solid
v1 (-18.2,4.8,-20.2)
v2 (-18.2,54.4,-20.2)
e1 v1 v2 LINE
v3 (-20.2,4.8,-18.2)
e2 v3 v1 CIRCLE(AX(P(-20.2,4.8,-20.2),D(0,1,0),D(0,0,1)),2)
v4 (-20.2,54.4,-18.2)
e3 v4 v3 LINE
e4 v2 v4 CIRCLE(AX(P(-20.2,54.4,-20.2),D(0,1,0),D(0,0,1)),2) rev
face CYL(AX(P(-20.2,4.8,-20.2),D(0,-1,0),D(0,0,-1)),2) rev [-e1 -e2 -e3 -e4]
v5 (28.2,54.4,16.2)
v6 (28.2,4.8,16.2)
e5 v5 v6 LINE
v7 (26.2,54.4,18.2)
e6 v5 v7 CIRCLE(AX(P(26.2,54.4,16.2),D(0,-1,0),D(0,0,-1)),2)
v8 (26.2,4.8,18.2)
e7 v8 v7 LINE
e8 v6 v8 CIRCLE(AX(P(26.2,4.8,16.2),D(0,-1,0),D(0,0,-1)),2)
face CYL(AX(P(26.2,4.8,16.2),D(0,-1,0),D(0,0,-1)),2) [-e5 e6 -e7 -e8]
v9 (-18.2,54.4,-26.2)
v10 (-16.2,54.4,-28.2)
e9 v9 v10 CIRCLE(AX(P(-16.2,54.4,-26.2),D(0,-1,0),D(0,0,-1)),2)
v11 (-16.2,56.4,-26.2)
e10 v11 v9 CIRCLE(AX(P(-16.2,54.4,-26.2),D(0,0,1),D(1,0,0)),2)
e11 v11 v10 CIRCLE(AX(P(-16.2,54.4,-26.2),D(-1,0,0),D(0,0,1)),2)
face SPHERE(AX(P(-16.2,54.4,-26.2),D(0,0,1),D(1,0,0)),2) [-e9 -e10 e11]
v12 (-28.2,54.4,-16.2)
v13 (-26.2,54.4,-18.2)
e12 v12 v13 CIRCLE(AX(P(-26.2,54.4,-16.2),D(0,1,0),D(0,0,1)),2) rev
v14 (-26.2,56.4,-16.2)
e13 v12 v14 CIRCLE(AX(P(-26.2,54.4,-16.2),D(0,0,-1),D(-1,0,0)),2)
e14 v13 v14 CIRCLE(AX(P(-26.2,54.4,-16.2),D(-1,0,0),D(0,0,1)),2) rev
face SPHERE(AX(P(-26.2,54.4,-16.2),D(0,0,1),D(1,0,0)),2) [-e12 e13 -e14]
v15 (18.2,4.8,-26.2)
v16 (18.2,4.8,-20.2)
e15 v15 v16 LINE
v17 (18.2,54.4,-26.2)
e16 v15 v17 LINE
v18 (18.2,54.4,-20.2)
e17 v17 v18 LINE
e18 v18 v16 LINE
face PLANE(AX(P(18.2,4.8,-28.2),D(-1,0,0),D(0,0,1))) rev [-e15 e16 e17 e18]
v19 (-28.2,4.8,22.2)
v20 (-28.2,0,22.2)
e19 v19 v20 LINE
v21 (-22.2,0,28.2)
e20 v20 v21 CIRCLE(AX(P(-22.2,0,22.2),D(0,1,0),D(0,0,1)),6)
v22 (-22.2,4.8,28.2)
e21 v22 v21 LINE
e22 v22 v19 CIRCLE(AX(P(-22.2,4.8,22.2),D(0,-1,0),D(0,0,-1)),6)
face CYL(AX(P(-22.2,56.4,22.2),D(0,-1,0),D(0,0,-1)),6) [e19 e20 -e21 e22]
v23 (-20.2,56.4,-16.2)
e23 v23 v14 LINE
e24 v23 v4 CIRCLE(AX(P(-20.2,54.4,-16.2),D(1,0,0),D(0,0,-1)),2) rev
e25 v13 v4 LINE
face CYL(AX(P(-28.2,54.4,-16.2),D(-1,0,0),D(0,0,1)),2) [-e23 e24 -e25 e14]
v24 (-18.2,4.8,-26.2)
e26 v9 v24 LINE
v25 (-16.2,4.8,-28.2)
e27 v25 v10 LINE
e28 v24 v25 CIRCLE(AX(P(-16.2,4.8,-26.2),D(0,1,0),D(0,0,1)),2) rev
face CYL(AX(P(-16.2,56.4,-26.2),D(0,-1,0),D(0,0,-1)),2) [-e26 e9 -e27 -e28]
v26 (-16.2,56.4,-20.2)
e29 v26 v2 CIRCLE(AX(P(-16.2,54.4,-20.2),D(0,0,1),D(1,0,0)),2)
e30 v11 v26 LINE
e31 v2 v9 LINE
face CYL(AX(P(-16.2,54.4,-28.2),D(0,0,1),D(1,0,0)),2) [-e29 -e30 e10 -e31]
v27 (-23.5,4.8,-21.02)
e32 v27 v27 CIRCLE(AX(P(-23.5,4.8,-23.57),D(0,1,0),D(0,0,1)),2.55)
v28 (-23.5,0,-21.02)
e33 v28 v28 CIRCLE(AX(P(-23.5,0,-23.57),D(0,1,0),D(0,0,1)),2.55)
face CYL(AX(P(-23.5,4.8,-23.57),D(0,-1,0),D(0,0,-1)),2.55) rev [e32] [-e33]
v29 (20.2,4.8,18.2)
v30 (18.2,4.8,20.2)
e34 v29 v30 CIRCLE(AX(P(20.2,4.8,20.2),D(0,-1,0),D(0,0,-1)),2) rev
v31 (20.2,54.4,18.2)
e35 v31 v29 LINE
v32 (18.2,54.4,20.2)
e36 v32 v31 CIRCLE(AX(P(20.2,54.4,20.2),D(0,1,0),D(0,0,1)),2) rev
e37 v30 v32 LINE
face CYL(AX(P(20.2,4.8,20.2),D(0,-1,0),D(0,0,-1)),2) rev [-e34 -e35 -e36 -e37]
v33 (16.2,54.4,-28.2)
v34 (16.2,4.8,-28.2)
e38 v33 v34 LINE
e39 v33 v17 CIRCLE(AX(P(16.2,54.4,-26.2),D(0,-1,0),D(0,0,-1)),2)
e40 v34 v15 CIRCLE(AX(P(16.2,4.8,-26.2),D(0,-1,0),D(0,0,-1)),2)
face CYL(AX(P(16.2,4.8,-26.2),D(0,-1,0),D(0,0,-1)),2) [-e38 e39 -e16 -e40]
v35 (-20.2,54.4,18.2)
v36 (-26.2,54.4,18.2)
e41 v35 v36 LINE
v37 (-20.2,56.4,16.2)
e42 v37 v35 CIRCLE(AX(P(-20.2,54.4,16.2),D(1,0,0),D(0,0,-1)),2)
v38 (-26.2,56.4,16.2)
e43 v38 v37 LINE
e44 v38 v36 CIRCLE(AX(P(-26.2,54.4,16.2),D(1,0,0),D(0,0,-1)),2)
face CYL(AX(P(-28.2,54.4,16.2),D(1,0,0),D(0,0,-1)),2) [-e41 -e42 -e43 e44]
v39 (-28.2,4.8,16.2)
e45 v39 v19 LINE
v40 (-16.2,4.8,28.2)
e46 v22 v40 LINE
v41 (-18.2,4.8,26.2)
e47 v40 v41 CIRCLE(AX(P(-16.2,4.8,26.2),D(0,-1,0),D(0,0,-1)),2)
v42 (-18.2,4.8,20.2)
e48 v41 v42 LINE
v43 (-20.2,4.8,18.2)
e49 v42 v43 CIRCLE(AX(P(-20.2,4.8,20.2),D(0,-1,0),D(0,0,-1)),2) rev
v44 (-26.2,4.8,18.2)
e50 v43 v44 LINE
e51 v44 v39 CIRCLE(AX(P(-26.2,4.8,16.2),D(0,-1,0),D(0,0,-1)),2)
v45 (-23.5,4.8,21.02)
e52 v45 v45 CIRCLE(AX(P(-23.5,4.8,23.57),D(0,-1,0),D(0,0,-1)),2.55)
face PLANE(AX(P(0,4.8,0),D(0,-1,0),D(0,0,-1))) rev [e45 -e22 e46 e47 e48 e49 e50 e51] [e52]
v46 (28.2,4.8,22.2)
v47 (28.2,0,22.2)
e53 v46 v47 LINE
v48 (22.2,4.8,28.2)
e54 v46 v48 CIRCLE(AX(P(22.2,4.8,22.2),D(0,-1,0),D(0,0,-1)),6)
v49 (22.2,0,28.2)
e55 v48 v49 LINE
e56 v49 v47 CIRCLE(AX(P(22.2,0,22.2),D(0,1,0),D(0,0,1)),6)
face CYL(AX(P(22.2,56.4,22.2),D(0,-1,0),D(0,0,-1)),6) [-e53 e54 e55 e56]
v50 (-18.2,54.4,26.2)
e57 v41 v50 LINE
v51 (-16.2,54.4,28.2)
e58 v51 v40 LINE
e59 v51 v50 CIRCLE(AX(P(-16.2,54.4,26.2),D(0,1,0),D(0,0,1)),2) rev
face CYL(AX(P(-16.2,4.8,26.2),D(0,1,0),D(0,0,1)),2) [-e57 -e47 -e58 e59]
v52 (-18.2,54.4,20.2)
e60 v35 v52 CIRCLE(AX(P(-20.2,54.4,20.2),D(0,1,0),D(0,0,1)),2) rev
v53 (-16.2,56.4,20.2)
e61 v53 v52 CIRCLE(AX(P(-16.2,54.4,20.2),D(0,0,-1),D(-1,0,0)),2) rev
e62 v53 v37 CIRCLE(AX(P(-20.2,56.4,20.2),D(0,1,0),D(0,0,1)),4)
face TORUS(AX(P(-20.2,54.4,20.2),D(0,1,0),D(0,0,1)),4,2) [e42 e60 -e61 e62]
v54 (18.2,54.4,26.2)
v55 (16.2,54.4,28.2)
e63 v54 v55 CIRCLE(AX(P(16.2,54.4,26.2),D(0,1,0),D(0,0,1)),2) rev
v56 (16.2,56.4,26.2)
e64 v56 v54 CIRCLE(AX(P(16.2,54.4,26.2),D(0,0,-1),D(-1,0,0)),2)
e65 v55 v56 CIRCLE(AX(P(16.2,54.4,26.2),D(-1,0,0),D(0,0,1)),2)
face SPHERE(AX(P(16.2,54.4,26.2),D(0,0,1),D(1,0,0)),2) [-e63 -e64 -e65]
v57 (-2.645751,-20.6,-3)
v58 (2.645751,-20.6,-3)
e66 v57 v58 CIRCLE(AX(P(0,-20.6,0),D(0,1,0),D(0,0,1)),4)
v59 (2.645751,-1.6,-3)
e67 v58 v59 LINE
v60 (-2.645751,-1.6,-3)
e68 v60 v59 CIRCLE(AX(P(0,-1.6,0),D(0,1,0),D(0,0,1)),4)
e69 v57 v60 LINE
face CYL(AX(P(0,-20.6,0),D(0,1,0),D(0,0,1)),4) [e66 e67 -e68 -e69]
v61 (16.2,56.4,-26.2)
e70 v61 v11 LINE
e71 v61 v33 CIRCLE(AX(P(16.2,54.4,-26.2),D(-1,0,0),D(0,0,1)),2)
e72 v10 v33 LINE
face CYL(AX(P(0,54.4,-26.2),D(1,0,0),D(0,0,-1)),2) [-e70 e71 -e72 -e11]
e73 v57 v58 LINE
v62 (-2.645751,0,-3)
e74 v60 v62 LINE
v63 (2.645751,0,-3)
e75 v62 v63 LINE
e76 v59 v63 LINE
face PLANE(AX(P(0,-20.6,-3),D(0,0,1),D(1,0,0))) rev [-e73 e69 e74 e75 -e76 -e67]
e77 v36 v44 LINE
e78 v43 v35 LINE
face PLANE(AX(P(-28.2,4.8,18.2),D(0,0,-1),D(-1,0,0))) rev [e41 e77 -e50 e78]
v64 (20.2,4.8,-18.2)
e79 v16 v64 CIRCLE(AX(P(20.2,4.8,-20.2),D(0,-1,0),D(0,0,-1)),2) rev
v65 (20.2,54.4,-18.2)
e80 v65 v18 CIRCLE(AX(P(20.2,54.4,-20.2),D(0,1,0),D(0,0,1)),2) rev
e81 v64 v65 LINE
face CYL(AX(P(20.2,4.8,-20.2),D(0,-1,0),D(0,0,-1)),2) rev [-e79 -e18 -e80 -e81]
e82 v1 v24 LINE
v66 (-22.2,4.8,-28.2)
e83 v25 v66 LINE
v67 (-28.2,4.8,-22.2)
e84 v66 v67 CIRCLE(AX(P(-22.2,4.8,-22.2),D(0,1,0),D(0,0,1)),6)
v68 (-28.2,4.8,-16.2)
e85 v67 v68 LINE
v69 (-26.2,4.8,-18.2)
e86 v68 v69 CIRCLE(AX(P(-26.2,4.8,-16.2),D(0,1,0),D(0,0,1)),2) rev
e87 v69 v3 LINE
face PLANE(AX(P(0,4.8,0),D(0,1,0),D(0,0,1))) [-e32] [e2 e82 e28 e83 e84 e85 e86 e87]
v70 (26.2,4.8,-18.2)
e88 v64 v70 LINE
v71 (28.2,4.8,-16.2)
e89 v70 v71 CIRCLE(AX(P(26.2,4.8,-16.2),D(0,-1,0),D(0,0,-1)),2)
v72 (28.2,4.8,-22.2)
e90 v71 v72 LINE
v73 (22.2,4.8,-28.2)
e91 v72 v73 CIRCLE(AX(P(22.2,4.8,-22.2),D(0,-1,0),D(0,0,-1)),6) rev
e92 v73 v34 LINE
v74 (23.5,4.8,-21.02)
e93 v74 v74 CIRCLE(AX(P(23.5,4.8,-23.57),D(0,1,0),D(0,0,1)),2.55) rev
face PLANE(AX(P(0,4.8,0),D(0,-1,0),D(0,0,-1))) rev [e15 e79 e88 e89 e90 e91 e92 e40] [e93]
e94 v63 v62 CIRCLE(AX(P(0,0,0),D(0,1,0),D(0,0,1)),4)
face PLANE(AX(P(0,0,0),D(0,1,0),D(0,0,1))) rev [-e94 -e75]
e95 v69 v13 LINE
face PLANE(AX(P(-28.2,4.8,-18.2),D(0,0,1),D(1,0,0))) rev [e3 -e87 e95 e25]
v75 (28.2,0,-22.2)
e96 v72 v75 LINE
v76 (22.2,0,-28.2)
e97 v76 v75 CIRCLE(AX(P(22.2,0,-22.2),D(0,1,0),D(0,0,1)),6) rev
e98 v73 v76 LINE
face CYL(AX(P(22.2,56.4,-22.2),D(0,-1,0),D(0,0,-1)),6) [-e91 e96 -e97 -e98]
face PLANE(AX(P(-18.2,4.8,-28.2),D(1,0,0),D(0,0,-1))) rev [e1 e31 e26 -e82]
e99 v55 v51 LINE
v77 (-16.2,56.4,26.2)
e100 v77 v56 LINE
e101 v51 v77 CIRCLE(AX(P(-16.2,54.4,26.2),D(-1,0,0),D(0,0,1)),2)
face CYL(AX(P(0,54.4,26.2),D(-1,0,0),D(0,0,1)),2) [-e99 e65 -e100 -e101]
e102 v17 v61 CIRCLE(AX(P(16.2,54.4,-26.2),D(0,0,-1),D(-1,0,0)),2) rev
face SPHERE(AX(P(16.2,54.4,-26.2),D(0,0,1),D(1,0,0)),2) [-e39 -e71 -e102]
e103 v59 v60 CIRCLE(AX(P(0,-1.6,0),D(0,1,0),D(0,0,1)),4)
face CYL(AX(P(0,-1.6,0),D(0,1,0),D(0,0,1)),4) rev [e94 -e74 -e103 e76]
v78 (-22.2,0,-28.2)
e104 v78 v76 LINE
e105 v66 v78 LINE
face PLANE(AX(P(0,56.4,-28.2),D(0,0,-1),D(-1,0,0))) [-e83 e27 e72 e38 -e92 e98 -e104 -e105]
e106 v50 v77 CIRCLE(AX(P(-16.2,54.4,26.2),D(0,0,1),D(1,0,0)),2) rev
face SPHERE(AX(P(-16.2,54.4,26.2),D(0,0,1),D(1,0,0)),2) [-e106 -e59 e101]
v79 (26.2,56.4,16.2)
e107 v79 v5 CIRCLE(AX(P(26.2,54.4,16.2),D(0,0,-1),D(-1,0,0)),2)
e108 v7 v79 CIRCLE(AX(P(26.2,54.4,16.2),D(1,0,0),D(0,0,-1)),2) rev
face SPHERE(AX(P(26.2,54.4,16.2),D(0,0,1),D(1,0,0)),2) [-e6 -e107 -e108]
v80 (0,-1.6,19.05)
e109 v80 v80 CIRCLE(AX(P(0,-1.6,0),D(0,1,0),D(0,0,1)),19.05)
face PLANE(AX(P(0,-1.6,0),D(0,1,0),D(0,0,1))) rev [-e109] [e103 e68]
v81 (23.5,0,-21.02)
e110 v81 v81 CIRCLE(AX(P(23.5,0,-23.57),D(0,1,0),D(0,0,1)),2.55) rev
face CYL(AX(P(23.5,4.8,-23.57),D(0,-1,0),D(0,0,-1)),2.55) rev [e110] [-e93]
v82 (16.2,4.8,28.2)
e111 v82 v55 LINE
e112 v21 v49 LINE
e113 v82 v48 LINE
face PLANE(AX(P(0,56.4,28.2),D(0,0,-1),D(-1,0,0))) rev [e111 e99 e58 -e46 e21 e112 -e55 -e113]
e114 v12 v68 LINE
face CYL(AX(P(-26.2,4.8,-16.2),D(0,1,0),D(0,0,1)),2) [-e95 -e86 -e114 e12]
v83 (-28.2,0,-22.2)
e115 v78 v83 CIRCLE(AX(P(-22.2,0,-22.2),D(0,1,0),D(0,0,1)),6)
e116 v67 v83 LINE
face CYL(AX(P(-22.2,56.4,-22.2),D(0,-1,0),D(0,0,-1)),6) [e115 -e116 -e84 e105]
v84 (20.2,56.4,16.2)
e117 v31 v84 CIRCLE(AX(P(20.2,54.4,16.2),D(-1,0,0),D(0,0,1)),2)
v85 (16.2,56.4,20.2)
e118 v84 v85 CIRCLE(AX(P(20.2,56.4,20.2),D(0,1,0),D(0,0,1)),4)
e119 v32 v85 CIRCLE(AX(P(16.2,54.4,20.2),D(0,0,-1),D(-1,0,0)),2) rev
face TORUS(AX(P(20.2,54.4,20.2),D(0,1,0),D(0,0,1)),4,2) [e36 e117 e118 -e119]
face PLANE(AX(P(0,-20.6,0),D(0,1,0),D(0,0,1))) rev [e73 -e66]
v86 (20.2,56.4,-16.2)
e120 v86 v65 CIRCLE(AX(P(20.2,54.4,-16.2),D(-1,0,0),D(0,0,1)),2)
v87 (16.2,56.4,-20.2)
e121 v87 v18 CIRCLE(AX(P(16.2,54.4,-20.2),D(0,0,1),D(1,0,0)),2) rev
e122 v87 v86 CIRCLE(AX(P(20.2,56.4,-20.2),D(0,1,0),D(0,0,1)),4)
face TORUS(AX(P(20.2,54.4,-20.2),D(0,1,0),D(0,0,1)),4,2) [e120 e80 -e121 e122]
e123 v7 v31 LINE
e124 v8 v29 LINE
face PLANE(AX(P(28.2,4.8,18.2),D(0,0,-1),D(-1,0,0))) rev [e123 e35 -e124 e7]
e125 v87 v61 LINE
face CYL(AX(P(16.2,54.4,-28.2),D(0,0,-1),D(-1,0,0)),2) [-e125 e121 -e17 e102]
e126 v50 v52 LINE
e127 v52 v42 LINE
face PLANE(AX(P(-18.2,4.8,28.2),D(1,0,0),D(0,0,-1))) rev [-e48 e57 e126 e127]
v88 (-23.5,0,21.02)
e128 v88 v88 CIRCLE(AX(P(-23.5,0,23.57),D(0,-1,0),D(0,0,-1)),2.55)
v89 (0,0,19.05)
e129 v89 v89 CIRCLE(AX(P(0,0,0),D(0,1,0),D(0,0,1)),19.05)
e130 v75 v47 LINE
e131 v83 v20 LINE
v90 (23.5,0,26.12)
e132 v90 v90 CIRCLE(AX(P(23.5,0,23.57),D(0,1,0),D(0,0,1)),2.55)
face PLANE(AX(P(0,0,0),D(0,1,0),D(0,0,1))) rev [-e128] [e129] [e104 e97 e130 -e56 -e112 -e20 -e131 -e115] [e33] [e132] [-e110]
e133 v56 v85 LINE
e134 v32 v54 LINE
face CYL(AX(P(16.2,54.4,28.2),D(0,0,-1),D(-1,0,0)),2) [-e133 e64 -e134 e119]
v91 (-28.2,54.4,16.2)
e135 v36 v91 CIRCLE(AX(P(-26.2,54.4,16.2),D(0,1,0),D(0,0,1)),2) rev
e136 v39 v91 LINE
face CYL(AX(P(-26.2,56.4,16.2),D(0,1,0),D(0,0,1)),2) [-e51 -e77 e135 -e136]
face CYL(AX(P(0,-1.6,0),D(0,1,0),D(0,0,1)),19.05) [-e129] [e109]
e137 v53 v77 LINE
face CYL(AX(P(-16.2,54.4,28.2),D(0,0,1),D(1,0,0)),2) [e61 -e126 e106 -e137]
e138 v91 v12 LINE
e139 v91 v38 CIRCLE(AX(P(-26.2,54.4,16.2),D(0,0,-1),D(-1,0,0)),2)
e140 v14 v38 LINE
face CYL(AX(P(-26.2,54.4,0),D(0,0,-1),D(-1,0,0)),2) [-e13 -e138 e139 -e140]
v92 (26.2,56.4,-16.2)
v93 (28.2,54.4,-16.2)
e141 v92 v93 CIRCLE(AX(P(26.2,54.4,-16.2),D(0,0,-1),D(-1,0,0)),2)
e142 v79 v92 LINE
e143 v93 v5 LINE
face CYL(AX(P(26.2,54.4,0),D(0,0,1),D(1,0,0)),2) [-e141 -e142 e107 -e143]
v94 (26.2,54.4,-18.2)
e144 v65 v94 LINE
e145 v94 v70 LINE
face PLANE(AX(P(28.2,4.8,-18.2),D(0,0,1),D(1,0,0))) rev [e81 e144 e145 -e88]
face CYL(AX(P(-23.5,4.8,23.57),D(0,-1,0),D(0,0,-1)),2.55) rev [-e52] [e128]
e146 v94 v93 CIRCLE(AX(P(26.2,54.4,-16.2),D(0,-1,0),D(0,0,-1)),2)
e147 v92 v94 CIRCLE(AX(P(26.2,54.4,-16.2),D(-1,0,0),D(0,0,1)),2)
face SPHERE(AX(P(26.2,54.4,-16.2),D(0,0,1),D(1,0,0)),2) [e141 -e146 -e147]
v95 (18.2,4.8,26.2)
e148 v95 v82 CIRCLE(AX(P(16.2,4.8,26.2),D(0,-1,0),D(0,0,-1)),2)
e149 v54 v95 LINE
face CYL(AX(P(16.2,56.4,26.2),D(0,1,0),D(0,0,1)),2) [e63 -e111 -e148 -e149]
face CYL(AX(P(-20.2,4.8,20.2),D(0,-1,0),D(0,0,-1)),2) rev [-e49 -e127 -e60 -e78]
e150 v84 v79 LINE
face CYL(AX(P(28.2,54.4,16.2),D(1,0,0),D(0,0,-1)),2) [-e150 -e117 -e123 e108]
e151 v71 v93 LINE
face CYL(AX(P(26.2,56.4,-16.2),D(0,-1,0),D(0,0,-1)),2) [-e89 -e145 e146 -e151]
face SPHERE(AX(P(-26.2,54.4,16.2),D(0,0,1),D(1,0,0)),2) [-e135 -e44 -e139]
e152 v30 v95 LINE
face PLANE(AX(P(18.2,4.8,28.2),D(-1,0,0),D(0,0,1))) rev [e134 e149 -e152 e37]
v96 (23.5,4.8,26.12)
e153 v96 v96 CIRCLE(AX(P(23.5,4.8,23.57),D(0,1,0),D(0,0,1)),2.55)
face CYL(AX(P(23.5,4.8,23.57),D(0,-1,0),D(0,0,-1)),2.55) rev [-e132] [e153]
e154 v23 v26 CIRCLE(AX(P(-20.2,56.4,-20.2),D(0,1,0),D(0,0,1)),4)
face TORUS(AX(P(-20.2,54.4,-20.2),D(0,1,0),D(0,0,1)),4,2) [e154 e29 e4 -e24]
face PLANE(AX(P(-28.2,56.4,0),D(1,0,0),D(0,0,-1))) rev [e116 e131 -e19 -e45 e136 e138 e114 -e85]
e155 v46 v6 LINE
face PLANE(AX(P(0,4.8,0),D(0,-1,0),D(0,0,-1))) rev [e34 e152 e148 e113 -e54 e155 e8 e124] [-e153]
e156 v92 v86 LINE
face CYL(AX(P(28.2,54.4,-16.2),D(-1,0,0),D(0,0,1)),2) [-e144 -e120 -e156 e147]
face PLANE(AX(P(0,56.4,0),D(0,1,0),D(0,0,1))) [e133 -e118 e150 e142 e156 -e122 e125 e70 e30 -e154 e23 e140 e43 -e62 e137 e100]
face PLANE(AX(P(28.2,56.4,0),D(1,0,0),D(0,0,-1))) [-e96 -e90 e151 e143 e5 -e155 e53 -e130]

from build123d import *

# Parameters (mm, degrees)
SKETCH_1_R          = 2.55
SKETCH_1_R_2        = 19.05
EXTRUDE_1_DEPTH     = 56.4
SKETCH_1_3_R        = 19.05
SKETCH_1_3_R_2      = 4
EXTRUDE_2_DEPTH     = 1.6
SKETCH_1_4_R        = 2.55
CUT_EXTRUDE_1_DEPTH = 4.8
EXTRUDE_3_DEPTH     = 20.6
SKETCH_4_W          = 10
SKETCH_4_H          = 10
CUT_EXTRUDE_3_DEPTH = 51.6
FILLET_3_R          = 2
FILLET_4_R          = 2


with BuildPart() as part:
    # 草图1 → 凸台-拉伸1 (new body)
    # profile 1 of 10: a face of its own
    with BuildSketch(Plane(origin=(0, 0, 0), x_dir=(1, 0, 0), z_dir=(0, 1, 0))):
        with BuildLine():
            Line((-22.2, 28.2), (22.2, 28.2))
            ThreePointArc((22.2, 28.2), (26.442640687, 26.442640687), (28.2, 22.2))
            Line((28.2, 22.2), (28.2, -22.2))
            ThreePointArc((28.2, -22.2), (26.442640687, -26.442640687), (22.2, -28.2))
            Line((22.2, -28.2), (-22.2, -28.2))
            ThreePointArc((-22.2, -28.2), (-26.442640687, -26.442640687), (-28.2, -22.2))
            Line((-28.2, -22.2), (-28.2, 22.2))
            ThreePointArc((-28.2, 22.2), (-26.442640687, 26.442640687), (-22.2, 28.2))
        make_face()
        with Locations((23.5, 23.57)):
            Circle(SKETCH_1_R, mode=Mode.SUBTRACT)
        with Locations((23.5, -23.57)):
            Circle(SKETCH_1_R, mode=Mode.SUBTRACT)
        Circle(SKETCH_1_R_2, mode=Mode.SUBTRACT)
        with Locations((-23.5, 23.57)):
            Circle(SKETCH_1_R, mode=Mode.SUBTRACT)
        with Locations((-23.5, -23.57)):
            Circle(SKETCH_1_R, mode=Mode.SUBTRACT)
    # profile 2 of 10: a face of its own
    with BuildSketch(Plane(origin=(0, 0, 0), x_dir=(1, 0, 0), z_dir=(0, 1, 0))):
        Circle(SKETCH_1_R_2)
    # profile 3 of 10: a face of its own
    with BuildSketch(Plane(origin=(0, 0, 0), x_dir=(1, 0, 0), z_dir=(0, 1, 0))):
        with Locations((-23.5, 23.57)):
            Circle(SKETCH_1_R)
    # profile 4 of 10: a face of its own
    with BuildSketch(Plane(origin=(0, 0, 0), x_dir=(1, 0, 0), z_dir=(0, 1, 0))):
        with Locations((23.5, 23.57)):
            Circle(SKETCH_1_R)
    # profile 5 of 10: a face of its own
    with BuildSketch(Plane(origin=(0, 0, 0), x_dir=(1, 0, 0), z_dir=(0, 1, 0))):
        with Locations((23.5, -23.57)):
            Circle(SKETCH_1_R)
    # profile 6 of 10: a face of its own
    with BuildSketch(Plane(origin=(0, 0, 0), x_dir=(1, 0, 0), z_dir=(0, 1, 0))):
        with Locations((-23.5, -23.57)):
            Circle(SKETCH_1_R)
    # profile 7 of 10: a face of its own
    with BuildSketch(Plane(origin=(0, 0, 0), x_dir=(1, 0, 0), z_dir=(0, 1, 0))):
        with BuildLine():
            ThreePointArc((2.645751311, 3), (0, 4), (-2.645751311, 3))
            Line((-2.645751311, 3), (2.645751311, 3))
        make_face()
    # profile 8 of 10: a face of its own
    with BuildSketch(Plane(origin=(0, 0, 0), x_dir=(1, 0, 0), z_dir=(0, 1, 0))):
        with BuildLine():
            Line((2.645751311, 3), (-2.645751311, 3))
            ThreePointArc((-2.645751311, 3), (-1.645751311, -3.645751311), (4, 0))
            ThreePointArc((4, 0), (3.645751311, 1.645751311), (2.645751311, 3))
        make_face()
    # profile 9 of 10: a face of its own
    with BuildSketch(Plane(origin=(0, 0, 0), x_dir=(1, 0, 0), z_dir=(0, 1, 0))):
        with BuildLine():
            ThreePointArc((2.645751311, 3), (0, 4), (-2.645751311, 3))
            Line((-2.645751311, 3), (2.645751311, 3))
        make_face()
    # profile 10 of 10: a face of its own
    with BuildSketch(Plane(origin=(0, 0, 0), x_dir=(1, 0, 0), z_dir=(0, 1, 0))):
        with BuildLine():
            Line((2.645751311, 3), (-2.645751311, 3))
            ThreePointArc((-2.645751311, 3), (-1.645751311, -3.645751311), (4, 0))
            ThreePointArc((4, 0), (3.645751311, 1.645751311), (2.645751311, 3))
        make_face()
    extrude(amount=EXTRUDE_1_DEPTH)

    # 草图1<3> → 凸台-拉伸2 (add)
    with BuildSketch(Plane(origin=(0, 0, 0), x_dir=(1, 0, 0), z_dir=(0, 1, 0))):
        with Locations(Location((0, 0, 0), (0, 0, 270))):
            Circle(SKETCH_1_3_R)
        with Locations(Location((0, 0, 0), (0, 0, 270))):
            Circle(SKETCH_1_3_R_2, mode=Mode.SUBTRACT)
    extrude(amount=-EXTRUDE_2_DEPTH)

    # 草图1<4> → 切除-拉伸1 (cut)
    with BuildSketch(Plane(origin=(0, 0, 0), x_dir=(1, 0, 0), z_dir=(0, 1, 0))):
        with Locations(Location((23.5, -23.57, 0), (0, 0, 270))):
            Circle(SKETCH_1_4_R)
        with Locations(Location((-23.5, 23.57, 0), (0, 0, 270))):
            Circle(SKETCH_1_4_R)
        with Locations(Location((23.5, 23.57, 0), (0, 0, 270))):
            Circle(SKETCH_1_4_R)
        with Locations(Location((-23.5, -23.57, 0), (0, 0, 90))):
            Circle(SKETCH_1_4_R)
    extrude(amount=CUT_EXTRUDE_1_DEPTH, mode=Mode.SUBTRACT)

    # 草图1<5> → 凸台-拉伸3 (add)
    with BuildSketch(Plane(origin=(0, 0, 0), x_dir=(1, 0, 0), z_dir=(0, 1, 0))):
        with BuildLine():
            Line((2.645751311, 3), (-2.645751311, 3))
            ThreePointArc((-2.645751311, 3), (-1.645751311, -3.645751311), (4, 0))
            ThreePointArc((4, 0), (3.645751311, 1.645751311), (2.645751311, 3))
        make_face()
    extrude(amount=-EXTRUDE_3_DEPTH)

    # 草图4 → 切除-拉伸3 (cut)
    with BuildSketch(Plane(origin=(0, 56.4, 0), x_dir=(1, 0, 0), z_dir=(0, 1, 0))):
        with Locations((-23.2, 23.2)):
            Rectangle(SKETCH_4_W, SKETCH_4_H)
        with Locations((-23.2, -23.2)):
            Rectangle(SKETCH_4_W, SKETCH_4_H)
        with Locations((23.2, -23.2)):
            Rectangle(SKETCH_4_W, SKETCH_4_H)
        with Locations((23.2, 23.2)):
            Rectangle(SKETCH_4_W, SKETCH_4_H)
    extrude(amount=-CUT_EXTRUDE_3_DEPTH, mode=Mode.SUBTRACT)

    # 圆角3
    fillet_3_edges = [part.edges().sort_by_distance(p)[0] for p in [
        (-23.2, 56.4, -18.2),
        (-18.2, 56.4, -23.2),
        (-28.2, 30.6, -18.2),
        (-18.2, 30.6, -28.2),
        (-18.2, 30.6, -18.2),
        (28.2, 30.6, -18.2),
        (18.2, 30.6, -18.2),
        (18.2, 30.6, -28.2),
        (18.2, 56.4, -23.2),
        (23.2, 56.4, -18.2),
        (23.2, 56.4, 18.2),
        (18.2, 56.4, 23.2),
        (28.2, 30.6, 18.2),
        (18.2, 30.6, 28.2),
        (18.2, 30.6, 18.2),
        (-18.2, 56.4, 23.2),
        (-23.2, 56.4, 18.2),
        (-18.2, 30.6, 28.2),
        (-28.2, 30.6, 18.2),
        (-18.2, 30.6, 18.2),
    ]]
    fillet(fillet_3_edges, radius=FILLET_3_R)

    # 圆角4
    # the kernel refuses this fillet: 2 mm, written as the material it takes off along each edge
    with BuildSketch(Plane(origin=(26.2, 54.4, 16.2), x_dir=(0, 1, 0), z_dir=(1, 0, 0))) as fillet_4_piece_1_section:
        Polygon((0, 0), (FILLET_4_R, 0), (FILLET_4_R, FILLET_4_R), (0, FILLET_4_R), align=None)
    fillet_4_piece_1 = extrude(amount=FILLET_4_R, mode=Mode.PRIVATE)
    fillet_4_piece_1 = fillet_4_piece_1 - Plane(origin=(26.2, 54.4, 16.2), x_dir=(0, -0.7071067811865475, -0.7071067811865475), z_dir=(1, 0, 0)) * Sphere(FILLET_4_R, mode=Mode.PRIVATE)
    add(fillet_4_piece_1, mode=Mode.SUBTRACT)
    with BuildSketch(Plane(origin=(16.2, 54.4, 26.2), x_dir=(0, 1, 0), z_dir=(0, 0, 1))) as fillet_4_piece_2_section:
        Polygon((0, 0), (FILLET_4_R, 0), (FILLET_4_R, -FILLET_4_R), (0, -FILLET_4_R), align=None)
    fillet_4_piece_2 = extrude(amount=FILLET_4_R, mode=Mode.PRIVATE)
    fillet_4_piece_2 = fillet_4_piece_2 - Plane(origin=(16.2, 54.4, 26.2), x_dir=(-0.7071067811865475, -0.7071067811865475, 1.0048591735576168e-15), z_dir=(0, 0, 1)) * Sphere(FILLET_4_R, mode=Mode.PRIVATE)
    add(fillet_4_piece_2, mode=Mode.SUBTRACT)
    with BuildSketch(Plane(origin=(-26.2, 54.4, 16.2), x_dir=(0, 1, 0), z_dir=(-1, 0, 0))) as fillet_4_piece_3_section:
        Polygon((0, 0), (FILLET_4_R, 0), (FILLET_4_R, -FILLET_4_R), (0, -FILLET_4_R), align=None)
    fillet_4_piece_3 = extrude(amount=FILLET_4_R, mode=Mode.PRIVATE)
    fillet_4_piece_3 = fillet_4_piece_3 - Plane(origin=(-26.2, 54.4, 16.2), x_dir=(0, -0.7071067811865475, -0.7071067811865475), z_dir=(-1, 0, 0)) * Sphere(FILLET_4_R, mode=Mode.PRIVATE)
    add(fillet_4_piece_3, mode=Mode.SUBTRACT)
    with BuildSketch(Plane(origin=(-16.2, 54.4, 26.2), x_dir=(0, 1, 0), z_dir=(0, 0, 1))) as fillet_4_piece_4_section:
        Polygon((0, 0), (FILLET_4_R, 0), (FILLET_4_R, FILLET_4_R), (0, FILLET_4_R), align=None)
    fillet_4_piece_4 = extrude(amount=FILLET_4_R, mode=Mode.PRIVATE)
    fillet_4_piece_4 = fillet_4_piece_4 - Plane(origin=(-16.2, 54.4, 26.2), x_dir=(0.7071067811865475, -0.7071067811865475, 0), z_dir=(0, 0, 1)) * Sphere(FILLET_4_R, mode=Mode.PRIVATE)
    add(fillet_4_piece_4, mode=Mode.SUBTRACT)
    with BuildSketch(Plane(origin=(-16.2, 54.4, -26.2), x_dir=(0, 1, 0), z_dir=(0, 0, -1))) as fillet_4_piece_5_section:
        Polygon((0, 0), (FILLET_4_R, 0), (FILLET_4_R, -FILLET_4_R), (0, -FILLET_4_R), align=None)
    fillet_4_piece_5 = extrude(amount=FILLET_4_R, mode=Mode.PRIVATE)
    fillet_4_piece_5 = fillet_4_piece_5 - Plane(origin=(-16.2, 54.4, -26.2), x_dir=(0.7071067811865475, -0.7071067811865475, 0), z_dir=(0, 0, -1)) * Sphere(FILLET_4_R, mode=Mode.PRIVATE)
    add(fillet_4_piece_5, mode=Mode.SUBTRACT)
    with BuildSketch(Plane(origin=(-26.2, 54.4, -16.2), x_dir=(0, 1, 0), z_dir=(-1, 0, 0))) as fillet_4_piece_6_section:
        Polygon((0, 0), (FILLET_4_R, 0), (FILLET_4_R, FILLET_4_R), (0, FILLET_4_R), align=None)
    fillet_4_piece_6 = extrude(amount=FILLET_4_R, mode=Mode.PRIVATE)
    fillet_4_piece_6 = fillet_4_piece_6 - Plane(origin=(-26.2, 54.4, -16.2), x_dir=(0, -0.7071067811865475, 0.7071067811865475), z_dir=(-1, 0, 0)) * Sphere(FILLET_4_R, mode=Mode.PRIVATE)
    add(fillet_4_piece_6, mode=Mode.SUBTRACT)
    with BuildSketch(Plane(origin=(26.2, 54.4, -16.2), x_dir=(0, 1, 0), z_dir=(1, 0, 0))) as fillet_4_piece_7_section:
        Polygon((0, 0), (FILLET_4_R, 0), (FILLET_4_R, -FILLET_4_R), (0, -FILLET_4_R), align=None)
    fillet_4_piece_7 = extrude(amount=FILLET_4_R, mode=Mode.PRIVATE)
    fillet_4_piece_7 = fillet_4_piece_7 - Plane(origin=(26.2, 54.4, -16.2), x_dir=(0, -0.7071067811865475, 0.7071067811865475), z_dir=(1, 0, 0)) * Sphere(FILLET_4_R, mode=Mode.PRIVATE)
    add(fillet_4_piece_7, mode=Mode.SUBTRACT)
    with BuildSketch(Plane(origin=(16.2, 54.4, -26.2), x_dir=(0, 1, 0), z_dir=(0, 0, -1))) as fillet_4_piece_8_section:
        Polygon((0, 0), (FILLET_4_R, 0), (FILLET_4_R, FILLET_4_R), (0, FILLET_4_R), align=None)
    fillet_4_piece_8 = extrude(amount=FILLET_4_R, mode=Mode.PRIVATE)
    fillet_4_piece_8 = fillet_4_piece_8 - Plane(origin=(16.2, 54.4, -26.2), x_dir=(-0.7071067811865475, -0.7071067811865475, -1.0048591735576168e-15), z_dir=(0, 0, -1)) * Sphere(FILLET_4_R, mode=Mode.PRIVATE)
    add(fillet_4_piece_8, mode=Mode.SUBTRACT)
    with BuildSketch(Plane(origin=(-16.2, 56.4, -28.2), x_dir=(0, -1, 0), z_dir=(1, 0, 0)), Plane(origin=(-28.2, 56.4, 16.2), x_dir=(0, -1, 0), z_dir=(0, 0, -1)), Plane(origin=(16.2, 56.4, 28.2), x_dir=(0, -1, 0), z_dir=(-1, 0, 0)), Plane(origin=(28.2, 56.4, -16.2), x_dir=(0, -1, 0), z_dir=(0, 0, 1))) as fillet_4_piece_9:
        with BuildLine():
            CenterArc((FILLET_4_R, -FILLET_4_R), FILLET_4_R, 90, 90)
            Line((0, -FILLET_4_R), (0, 0))
            Line((0, 0), (FILLET_4_R, 0))
        make_face()
    extrude(amount=32.4, mode=Mode.SUBTRACT)


solid = part.part
